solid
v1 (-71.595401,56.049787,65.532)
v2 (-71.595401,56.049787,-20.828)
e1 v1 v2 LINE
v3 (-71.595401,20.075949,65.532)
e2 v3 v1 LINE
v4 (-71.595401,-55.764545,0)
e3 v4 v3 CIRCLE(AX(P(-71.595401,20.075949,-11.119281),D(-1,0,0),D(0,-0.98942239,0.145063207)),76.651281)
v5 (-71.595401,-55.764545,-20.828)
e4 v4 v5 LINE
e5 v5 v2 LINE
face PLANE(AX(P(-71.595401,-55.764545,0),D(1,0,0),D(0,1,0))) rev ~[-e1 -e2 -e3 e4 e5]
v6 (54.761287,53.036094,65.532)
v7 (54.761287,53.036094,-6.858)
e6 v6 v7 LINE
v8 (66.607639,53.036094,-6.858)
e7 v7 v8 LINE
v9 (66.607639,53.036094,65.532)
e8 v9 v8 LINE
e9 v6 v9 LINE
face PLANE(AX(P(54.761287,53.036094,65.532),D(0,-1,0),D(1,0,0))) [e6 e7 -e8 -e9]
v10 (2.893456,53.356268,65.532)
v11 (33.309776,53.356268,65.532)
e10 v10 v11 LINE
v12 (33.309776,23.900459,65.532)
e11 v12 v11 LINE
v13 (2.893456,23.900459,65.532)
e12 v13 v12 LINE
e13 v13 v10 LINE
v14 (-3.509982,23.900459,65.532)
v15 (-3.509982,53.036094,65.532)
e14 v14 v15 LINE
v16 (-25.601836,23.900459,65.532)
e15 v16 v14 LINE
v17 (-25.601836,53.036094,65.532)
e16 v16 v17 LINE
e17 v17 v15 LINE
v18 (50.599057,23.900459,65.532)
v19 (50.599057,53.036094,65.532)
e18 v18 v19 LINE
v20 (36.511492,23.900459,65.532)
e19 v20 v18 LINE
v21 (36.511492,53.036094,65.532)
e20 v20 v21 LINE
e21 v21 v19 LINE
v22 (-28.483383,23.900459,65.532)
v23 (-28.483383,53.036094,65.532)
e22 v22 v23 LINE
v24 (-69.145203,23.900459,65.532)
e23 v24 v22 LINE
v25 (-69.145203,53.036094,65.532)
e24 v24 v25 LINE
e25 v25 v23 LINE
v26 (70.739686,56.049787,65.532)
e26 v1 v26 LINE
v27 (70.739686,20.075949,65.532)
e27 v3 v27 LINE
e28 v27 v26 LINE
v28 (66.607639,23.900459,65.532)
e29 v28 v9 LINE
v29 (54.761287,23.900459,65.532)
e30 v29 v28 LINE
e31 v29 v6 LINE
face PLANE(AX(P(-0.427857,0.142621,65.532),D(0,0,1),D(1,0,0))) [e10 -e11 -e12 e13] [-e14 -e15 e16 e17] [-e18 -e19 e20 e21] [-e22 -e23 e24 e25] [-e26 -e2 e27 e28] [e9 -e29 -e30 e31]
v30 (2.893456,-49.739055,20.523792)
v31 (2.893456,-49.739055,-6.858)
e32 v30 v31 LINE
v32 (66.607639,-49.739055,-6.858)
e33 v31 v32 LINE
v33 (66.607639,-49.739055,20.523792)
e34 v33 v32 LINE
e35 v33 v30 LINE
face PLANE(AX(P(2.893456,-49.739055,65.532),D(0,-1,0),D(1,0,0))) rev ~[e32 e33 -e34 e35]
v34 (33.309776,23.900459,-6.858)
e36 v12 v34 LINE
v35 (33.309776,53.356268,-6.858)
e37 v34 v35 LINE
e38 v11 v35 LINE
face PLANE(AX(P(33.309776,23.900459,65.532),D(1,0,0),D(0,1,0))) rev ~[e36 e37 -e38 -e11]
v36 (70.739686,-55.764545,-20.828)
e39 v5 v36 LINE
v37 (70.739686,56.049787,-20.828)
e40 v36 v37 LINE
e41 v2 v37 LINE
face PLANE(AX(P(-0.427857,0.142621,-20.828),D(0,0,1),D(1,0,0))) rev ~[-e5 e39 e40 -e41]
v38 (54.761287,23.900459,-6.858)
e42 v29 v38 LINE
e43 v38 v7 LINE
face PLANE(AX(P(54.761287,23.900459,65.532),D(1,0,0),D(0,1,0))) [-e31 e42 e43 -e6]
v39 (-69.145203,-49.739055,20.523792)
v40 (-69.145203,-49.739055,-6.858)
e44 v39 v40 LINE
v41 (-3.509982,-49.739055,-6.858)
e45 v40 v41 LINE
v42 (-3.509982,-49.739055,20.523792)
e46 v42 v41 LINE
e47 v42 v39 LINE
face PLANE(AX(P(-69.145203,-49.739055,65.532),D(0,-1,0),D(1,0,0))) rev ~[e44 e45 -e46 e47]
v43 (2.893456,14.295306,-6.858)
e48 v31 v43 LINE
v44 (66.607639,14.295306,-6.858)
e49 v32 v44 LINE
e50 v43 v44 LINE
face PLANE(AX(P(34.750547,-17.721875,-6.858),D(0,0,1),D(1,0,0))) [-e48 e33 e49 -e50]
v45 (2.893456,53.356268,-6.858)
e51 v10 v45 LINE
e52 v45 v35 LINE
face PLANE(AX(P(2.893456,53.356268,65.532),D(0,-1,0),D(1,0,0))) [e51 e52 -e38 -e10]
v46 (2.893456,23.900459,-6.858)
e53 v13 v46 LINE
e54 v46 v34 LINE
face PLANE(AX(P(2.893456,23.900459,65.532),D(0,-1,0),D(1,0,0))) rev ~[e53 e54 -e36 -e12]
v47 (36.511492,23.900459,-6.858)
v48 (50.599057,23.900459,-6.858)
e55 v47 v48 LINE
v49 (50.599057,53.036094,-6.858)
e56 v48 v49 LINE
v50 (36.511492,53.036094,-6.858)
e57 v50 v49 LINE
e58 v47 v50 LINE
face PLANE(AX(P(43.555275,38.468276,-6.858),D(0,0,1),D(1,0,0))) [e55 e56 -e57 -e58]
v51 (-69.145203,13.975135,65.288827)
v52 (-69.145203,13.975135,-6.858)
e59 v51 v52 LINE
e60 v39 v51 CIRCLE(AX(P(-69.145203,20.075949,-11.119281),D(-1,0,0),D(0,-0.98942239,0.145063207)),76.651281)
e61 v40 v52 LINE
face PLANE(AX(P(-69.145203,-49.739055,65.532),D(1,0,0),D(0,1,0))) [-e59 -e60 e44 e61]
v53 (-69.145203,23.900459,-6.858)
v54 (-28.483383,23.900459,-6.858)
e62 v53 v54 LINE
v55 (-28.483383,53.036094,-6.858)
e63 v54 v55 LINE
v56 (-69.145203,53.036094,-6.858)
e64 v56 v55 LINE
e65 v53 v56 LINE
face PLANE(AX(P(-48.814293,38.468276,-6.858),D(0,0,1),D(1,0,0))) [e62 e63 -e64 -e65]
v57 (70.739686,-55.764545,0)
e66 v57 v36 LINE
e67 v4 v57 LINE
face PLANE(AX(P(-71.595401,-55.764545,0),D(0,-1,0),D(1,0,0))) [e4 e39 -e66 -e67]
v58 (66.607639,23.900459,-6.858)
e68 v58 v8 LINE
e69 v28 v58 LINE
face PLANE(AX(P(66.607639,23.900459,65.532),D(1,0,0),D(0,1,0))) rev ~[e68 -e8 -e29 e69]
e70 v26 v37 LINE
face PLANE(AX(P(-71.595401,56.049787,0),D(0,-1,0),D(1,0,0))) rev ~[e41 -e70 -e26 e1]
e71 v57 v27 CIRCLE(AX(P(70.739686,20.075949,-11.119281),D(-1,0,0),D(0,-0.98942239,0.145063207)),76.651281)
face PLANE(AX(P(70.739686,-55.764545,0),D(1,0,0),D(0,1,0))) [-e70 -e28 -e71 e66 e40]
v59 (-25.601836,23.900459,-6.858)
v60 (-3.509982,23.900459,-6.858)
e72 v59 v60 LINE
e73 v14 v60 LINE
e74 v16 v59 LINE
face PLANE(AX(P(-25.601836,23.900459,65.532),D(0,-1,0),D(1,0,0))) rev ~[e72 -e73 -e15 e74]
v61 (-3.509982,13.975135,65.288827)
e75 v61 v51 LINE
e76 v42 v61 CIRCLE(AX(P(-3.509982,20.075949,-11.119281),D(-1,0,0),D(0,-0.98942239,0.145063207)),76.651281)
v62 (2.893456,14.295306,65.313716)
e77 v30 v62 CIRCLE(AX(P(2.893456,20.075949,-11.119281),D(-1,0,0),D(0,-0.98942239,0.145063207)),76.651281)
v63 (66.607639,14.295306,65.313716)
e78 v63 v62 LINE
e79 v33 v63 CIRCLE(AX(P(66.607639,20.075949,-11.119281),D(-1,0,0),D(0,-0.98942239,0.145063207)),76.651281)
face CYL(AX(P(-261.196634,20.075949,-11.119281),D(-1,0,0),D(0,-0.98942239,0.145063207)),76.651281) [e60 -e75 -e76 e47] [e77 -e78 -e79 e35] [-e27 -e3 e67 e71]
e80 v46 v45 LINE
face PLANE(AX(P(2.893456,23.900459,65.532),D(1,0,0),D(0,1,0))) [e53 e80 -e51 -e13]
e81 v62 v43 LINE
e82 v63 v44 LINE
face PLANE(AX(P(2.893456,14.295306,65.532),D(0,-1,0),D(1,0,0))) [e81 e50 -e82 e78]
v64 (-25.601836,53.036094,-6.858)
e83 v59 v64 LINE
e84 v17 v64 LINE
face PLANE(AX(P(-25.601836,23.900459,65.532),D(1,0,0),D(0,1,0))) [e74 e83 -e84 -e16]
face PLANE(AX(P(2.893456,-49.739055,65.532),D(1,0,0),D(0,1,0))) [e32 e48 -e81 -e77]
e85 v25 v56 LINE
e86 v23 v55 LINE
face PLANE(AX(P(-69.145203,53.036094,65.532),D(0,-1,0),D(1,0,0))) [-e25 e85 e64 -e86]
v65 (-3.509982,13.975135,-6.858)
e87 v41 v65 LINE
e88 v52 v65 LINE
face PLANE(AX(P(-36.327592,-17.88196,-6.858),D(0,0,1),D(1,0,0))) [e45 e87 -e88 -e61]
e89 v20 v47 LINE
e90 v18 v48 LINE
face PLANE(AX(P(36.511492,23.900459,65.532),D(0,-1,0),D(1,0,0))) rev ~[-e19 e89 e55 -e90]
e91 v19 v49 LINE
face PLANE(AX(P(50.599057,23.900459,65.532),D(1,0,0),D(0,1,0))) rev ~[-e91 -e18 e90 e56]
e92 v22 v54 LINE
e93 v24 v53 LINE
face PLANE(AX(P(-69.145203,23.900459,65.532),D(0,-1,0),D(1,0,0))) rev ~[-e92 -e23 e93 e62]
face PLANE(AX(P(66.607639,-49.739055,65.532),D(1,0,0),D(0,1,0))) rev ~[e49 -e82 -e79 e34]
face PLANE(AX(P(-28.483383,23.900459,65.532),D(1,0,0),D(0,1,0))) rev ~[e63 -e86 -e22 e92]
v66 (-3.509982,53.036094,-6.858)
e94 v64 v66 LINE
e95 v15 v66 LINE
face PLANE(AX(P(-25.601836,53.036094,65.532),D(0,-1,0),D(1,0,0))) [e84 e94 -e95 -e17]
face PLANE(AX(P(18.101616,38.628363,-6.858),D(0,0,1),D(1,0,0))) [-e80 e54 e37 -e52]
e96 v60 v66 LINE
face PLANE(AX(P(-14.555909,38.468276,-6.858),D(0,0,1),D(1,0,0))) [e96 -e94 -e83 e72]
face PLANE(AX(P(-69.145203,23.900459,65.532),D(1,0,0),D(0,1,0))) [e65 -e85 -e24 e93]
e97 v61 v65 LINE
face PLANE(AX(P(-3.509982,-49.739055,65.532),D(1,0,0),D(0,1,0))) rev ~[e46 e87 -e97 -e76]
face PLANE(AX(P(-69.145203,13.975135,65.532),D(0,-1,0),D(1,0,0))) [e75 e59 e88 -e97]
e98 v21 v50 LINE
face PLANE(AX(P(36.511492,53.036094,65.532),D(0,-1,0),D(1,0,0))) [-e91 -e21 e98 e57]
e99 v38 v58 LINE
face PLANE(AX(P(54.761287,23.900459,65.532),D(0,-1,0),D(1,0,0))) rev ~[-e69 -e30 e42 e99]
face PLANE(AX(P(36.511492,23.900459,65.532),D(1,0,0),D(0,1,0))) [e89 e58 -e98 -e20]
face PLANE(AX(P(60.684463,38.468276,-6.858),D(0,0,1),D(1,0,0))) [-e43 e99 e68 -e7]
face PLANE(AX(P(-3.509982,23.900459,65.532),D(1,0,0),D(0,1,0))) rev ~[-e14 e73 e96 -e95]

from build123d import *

# Parameters (mm, degrees)
F0_W        = 142.3350870609
F0_H        = 111.8143312633
F1_DEPTH    = 65.532
F2_T1_DEPTH = 521.5375533391
F4_DEPTH    = 20.828
F3_W        = 65.6352208462
F3_H        = 63.7141903862
F3_W_2      = 63.7141834013
F3_H_2      = 64.0343613923
F3_W_3      = 30.4163205437
F3_H_3      = 29.4558089226
F3_W_4      = 22.0918541308
F3_H_4      = 29.1356351227
F3_W_5      = 14.0875652432
F3_W_6      = 11.8463523686
F3_W_7      = 40.6618192792
F5_DEPTH    = 72.39


# Not quite as in the source:
# - a fillet or chamfer that OpenCascade refuses, or shapes differently, is made with other operations: its cross-section is extruded or revolved along the edge and cut away or added


with BuildPart() as f1:
    # F0 (on Top) → F1 (new body)
    with BuildSketch(Plane.XY):
        with Locations((-0.4278570414, 0.1426208764)):
            Rectangle(F0_W, F0_H)
    extrude(amount=F1_DEPTH)

    # F2: fillet of radius 76.6512806053 on 1 edges, made by hand

    # F2_s2 → F2_t1 (cut)
    with BuildSketch(Plane.YZ.offset(-261.1966337109)):
        with BuildLine():
            ThreePointArc((-55.7645447552, 0), (-30.0394768726, 46.8795379871), (20.0759485004, 65.532))
            Line((20.0759485004, 65.532), (-55.7645447552, 65.532))
            Line((-55.7645447552, 65.532), (-55.7645447552, 0))
        make_face()
    extrude(amount=F2_T1_DEPTH, mode=Mode.SUBTRACT)

    # F4 (add): a face of the model
    f4_faces = [f1.faces().sort_by_distance(p)[0] for p in [
        (-0.4278570414, 0.1426208764, 0),
    ]]
    extrude(f4_faces, amount=F4_DEPTH)

    # F3 (on face) → F5 (cut)
    with BuildSketch(Plane.XY.offset(65.532)):
        with Locations((-36.3275922136, -17.8819601424)):
            Rectangle(F3_W, F3_H)
        with Locations((34.7505474929, -17.7218746394)):
            Rectangle(F3_W_2, F3_H_2)
        with Locations((18.1016160641, 38.6283630505)):
            Rectangle(F3_W_3, F3_H_3)
        with Locations((-14.555908856, 38.4682761505)):
            Rectangle(F3_W_4, F3_H_4)
        with Locations((43.5552746058, 38.4682761505)):
            Rectangle(F3_W_5, F3_H_4)
        with Locations((60.6844630092, 38.4682761505)):
            Rectangle(F3_W_6, F3_H_4)
        with Locations((-48.8142929971, 38.4682761505)):
            Rectangle(F3_W_7, F3_H_4)
    extrude(amount=-F5_DEPTH, mode=Mode.SUBTRACT)


solid = f1.part
